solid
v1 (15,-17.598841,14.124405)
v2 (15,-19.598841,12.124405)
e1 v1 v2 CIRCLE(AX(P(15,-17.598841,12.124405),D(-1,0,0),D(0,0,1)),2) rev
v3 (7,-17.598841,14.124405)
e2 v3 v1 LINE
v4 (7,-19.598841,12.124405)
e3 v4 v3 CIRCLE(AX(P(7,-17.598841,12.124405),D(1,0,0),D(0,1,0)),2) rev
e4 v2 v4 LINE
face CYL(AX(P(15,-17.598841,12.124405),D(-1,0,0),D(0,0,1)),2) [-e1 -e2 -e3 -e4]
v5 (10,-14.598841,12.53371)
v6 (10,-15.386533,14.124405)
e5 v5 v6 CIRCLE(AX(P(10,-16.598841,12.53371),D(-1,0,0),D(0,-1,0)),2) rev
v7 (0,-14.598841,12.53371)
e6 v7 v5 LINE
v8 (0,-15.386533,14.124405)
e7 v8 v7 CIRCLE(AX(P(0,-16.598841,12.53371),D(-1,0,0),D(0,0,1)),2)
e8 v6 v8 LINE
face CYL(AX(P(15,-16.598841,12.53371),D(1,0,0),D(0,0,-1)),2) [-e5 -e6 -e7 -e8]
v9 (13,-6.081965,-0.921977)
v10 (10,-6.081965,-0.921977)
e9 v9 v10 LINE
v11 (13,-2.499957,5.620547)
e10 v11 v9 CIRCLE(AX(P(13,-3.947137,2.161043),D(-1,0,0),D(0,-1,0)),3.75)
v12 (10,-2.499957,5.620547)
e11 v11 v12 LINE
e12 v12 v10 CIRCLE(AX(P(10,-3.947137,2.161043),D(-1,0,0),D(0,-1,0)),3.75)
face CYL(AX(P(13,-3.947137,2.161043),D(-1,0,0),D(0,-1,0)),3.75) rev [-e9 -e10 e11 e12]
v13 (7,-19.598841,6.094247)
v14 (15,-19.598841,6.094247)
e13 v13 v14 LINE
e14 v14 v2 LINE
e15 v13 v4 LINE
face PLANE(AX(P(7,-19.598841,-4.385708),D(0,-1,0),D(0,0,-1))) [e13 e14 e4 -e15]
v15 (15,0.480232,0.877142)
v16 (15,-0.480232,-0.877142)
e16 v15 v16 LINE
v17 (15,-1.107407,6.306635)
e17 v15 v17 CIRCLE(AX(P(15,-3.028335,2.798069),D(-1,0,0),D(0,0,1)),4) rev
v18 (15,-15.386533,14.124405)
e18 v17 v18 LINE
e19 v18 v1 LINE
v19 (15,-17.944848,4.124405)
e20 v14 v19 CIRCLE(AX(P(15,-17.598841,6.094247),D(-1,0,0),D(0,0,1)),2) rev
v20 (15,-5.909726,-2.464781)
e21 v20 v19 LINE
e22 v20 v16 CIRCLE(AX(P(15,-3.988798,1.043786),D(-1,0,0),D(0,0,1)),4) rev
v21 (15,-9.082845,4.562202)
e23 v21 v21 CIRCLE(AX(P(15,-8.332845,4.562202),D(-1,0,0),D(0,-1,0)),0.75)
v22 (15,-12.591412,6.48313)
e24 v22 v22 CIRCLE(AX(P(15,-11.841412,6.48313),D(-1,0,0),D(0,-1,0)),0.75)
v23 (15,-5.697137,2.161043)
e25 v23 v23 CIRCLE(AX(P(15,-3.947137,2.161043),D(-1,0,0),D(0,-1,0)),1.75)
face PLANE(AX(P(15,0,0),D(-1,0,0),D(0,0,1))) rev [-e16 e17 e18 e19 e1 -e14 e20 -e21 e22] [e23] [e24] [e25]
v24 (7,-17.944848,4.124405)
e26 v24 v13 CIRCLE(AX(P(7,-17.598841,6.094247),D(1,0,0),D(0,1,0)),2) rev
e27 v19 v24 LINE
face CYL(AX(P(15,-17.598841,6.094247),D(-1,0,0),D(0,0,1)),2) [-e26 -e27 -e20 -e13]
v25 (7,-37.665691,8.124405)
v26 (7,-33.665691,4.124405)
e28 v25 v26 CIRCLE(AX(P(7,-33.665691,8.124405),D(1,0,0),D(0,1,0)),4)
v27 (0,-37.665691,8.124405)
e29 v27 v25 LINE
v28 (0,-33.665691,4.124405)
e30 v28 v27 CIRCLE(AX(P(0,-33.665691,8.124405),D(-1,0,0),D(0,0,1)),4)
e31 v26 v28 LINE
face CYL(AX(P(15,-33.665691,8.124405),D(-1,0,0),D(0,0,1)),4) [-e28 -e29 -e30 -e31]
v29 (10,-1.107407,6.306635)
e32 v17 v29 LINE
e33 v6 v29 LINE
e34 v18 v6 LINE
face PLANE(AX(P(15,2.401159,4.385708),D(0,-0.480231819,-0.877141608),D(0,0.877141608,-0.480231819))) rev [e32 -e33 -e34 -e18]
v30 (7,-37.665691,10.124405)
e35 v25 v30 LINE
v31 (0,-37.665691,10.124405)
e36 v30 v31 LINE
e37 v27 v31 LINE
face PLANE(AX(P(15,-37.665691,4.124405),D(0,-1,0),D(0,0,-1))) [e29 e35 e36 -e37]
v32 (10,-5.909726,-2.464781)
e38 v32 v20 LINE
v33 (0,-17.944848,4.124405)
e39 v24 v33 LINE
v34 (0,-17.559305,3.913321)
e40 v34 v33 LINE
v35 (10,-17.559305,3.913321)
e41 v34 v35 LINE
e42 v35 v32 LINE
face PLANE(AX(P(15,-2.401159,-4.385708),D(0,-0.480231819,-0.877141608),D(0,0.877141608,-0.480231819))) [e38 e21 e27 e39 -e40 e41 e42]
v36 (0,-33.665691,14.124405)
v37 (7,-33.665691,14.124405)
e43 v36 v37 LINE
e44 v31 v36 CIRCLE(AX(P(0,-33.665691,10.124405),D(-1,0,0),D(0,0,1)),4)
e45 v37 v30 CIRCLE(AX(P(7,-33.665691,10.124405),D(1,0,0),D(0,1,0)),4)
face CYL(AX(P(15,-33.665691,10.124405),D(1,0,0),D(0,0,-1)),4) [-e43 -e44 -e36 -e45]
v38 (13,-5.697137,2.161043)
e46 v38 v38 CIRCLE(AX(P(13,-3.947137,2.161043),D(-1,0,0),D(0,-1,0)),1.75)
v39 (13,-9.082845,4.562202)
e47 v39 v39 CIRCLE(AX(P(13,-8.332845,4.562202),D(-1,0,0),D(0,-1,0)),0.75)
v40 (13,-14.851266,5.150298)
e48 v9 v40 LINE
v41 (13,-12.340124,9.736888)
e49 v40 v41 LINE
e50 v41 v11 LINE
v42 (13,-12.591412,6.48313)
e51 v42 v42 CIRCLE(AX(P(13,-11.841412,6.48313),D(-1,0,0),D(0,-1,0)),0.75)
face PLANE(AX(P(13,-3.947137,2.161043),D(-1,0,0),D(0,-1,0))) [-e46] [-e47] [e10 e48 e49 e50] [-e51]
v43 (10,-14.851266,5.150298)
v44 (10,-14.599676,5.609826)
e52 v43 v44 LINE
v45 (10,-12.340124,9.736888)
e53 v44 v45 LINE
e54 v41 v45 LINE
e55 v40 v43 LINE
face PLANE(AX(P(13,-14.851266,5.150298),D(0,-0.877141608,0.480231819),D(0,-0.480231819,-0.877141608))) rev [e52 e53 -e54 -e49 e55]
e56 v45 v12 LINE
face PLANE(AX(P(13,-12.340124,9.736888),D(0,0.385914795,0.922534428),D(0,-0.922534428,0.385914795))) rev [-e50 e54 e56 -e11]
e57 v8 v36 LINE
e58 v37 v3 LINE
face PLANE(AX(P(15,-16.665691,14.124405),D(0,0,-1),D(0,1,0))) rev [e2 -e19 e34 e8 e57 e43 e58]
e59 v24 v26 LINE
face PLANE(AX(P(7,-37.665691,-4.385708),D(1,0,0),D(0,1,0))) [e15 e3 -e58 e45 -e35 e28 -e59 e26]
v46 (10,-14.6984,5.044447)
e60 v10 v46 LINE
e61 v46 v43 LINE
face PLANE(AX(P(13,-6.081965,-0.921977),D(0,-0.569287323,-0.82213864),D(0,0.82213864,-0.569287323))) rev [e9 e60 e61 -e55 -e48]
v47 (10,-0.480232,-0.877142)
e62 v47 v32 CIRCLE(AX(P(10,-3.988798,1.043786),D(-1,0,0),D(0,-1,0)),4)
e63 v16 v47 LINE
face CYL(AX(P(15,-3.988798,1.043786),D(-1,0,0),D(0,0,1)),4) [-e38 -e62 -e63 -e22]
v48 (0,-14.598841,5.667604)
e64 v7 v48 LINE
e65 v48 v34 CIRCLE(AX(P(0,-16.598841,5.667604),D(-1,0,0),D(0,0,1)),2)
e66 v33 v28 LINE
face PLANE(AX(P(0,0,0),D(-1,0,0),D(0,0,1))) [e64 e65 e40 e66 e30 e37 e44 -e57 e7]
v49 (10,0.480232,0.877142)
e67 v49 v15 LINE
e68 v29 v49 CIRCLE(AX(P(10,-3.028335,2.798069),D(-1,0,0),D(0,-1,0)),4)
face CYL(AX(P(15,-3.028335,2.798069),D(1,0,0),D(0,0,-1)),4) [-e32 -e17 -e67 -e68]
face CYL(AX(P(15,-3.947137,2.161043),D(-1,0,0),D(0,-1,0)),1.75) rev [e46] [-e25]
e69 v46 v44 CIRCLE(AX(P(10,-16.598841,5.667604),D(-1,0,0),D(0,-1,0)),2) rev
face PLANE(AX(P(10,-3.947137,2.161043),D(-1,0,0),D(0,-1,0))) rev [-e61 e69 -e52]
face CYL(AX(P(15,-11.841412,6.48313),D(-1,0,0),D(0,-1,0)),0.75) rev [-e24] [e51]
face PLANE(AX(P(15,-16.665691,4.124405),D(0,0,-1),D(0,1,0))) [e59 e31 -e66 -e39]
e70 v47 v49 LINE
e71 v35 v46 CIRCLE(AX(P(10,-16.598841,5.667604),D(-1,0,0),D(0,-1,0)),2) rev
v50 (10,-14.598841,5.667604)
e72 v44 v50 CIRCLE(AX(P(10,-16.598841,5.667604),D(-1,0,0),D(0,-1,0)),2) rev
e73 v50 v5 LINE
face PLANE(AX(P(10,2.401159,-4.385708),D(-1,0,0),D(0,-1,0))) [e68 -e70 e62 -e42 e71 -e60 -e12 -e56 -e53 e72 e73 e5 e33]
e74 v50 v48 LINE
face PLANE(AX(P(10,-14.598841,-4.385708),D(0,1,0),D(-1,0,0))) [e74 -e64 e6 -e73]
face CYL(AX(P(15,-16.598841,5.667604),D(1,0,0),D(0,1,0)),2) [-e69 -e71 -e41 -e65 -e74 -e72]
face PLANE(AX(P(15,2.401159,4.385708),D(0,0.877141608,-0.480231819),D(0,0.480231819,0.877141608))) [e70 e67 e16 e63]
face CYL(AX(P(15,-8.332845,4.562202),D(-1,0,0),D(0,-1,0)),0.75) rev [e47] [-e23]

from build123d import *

# Parameters (mm, degrees)
EXTRUDE_THIN1_DEPTH = 15
SKETCH4_OUTSIDE_W   = 26.324
SKETCH4_OUTSIDE_H   = 51.391
CUT_EXTRUDE1_DEPTH  = 45.568245566
CUT_EXTRUDE2_DEPTH  = 3
SKETCH7_R           = 1.75
SKETCH7_R_2         = 0.75
CUT_EXTRUDE3_DEPTH  = 43.275324346
FILLET1_R           = 4
FILLET2_R           = 2
FILLET3_R           = 2


with BuildPart() as part:
    # Sketch3 → Extrude-Thin1 (new body)
    with BuildSketch(Plane(origin=(0, 0, 0), x_dir=(0, 0, -1), z_dir=(1, 0, 0))):
        Polygon((-4.385708038, 2.401159095), (-14.124404563, -15.386533403), (-14.124404563, -37.665690546), (-4.124404563, -37.665690546), (-4.124404563, -17.944847689), (4.385708038, -2.401159095), align=None)
    extrude(amount=EXTRUDE_THIN1_DEPTH)

    # Sketch4 outside → Cut-Extrude1 (cut, through all)
    with BuildSketch(Plane.XY.offset(14.124404563)):
        with Locations((7.5, -17.6325)):
            Rectangle(SKETCH4_OUTSIDE_W, SKETCH4_OUTSIDE_H)
        Polygon((15, 2.401159095), (10, 2.401159095), (10, -14.598840905), (0, -14.598840905), (0, -37.665690546), (7, -37.665690546), (7, -19.598840905), (15, -19.598840905), align=None, mode=Mode.SUBTRACT)
    extrude(amount=-CUT_EXTRUDE1_DEPTH, mode=Mode.SUBTRACT)

    # Sketch6 → Cut-Extrude2 (cut)
    with BuildSketch(Plane.ZY.offset(-10)):
        with BuildLine():
            Line((-0.921976714, -6.081964697), (5.150298165, -14.851265553))
            Line((5.150298165, -14.851265553), (9.736888227, -12.340124285))
            Line((9.736888227, -12.340124285), (5.620547292, -2.499956755))
            ThreePointArc((5.620547292, -2.499956755), (0.360173864, -0.657856206), (-0.921976714, -6.081964697))
        make_face()
    extrude(amount=-CUT_EXTRUDE2_DEPTH, mode=Mode.SUBTRACT)

    # Sketch7 → Cut-Extrude3 (cut, through all)
    with BuildSketch(Plane.ZY.offset(-13)):
        with Locations(Location((2.161043186, -3.947137235, 0), (0, 0, 270))):
            Circle(SKETCH7_R)
        with Locations(Location((4.562202281, -8.332845273, 0), (0, 0, 270))):
            Circle(SKETCH7_R_2)
        with Locations(Location((6.483129558, -11.841411704, 0), (0, 0, 270))):
            Circle(SKETCH7_R_2)
    extrude(amount=-CUT_EXTRUDE3_DEPTH, mode=Mode.SUBTRACT)

    # Fillet1
    fillet1_edges = [part.edges().sort_by_distance(p)[0] for p in [
        (3.5, -37.665690546, 4.124404563),
        (3.5, -37.665690546, 14.124404563),
        (12.5, 2.401159095, 4.385708038),
        (12.5, -2.401159095, -4.385708038),
    ]]
    fillet(fillet1_edges, radius=FILLET1_R)

    # Fillet2
    # the kernel refuses this fillet: 2 mm, written as the material it takes off along each edge
    with BuildSketch(Plane(origin=(7, -19.598840905, 14.124404563), x_dir=(0, 1, 0), z_dir=(1, 0, 0))) as fillet2_piece_1:
        with BuildLine():
            CenterArc((FILLET2_R, -FILLET2_R), FILLET2_R, 90, 90)
            Line((0, -FILLET2_R), (-FILLET2_R * 0.02, -FILLET2_R))
            Line((-FILLET2_R * 0.02, -FILLET2_R), (-FILLET2_R * 0.02, FILLET2_R * 0.02))
            Line((-FILLET2_R * 0.02, FILLET2_R * 0.02), (FILLET2_R, FILLET2_R * 0.02))
            Line((FILLET2_R, FILLET2_R * 0.02), (FILLET2_R, 0))
        make_face()
    extrude(amount=13, mode=Mode.SUBTRACT)
    with BuildSketch(Plane(origin=(7, -19.598840905, 4.124404563), x_dir=(0, 1, 0), z_dir=(1, 0, 0))) as fillet2_piece_2:
        with BuildLine():
            CenterArc((2, 1.969842457), FILLET2_R, 180, 80.037511241)
            Line((0, 1.969842457), (-0.04, 1.969842457))
            Line((-0.04, 1.969842457), (-0.04, 0))
            Line((-0.04, 0), (0, -0.04))
            ThreePointArc((0, -0.04), (0.826996608, -0.04), (1.64707308, -0.039396849))
            Line((1.64707308, -0.039396849), (1.653993216, 0))
        make_face()
    extrude(amount=12.924606142, mode=Mode.SUBTRACT)

    # Fillet3
    # the kernel refuses this fillet: 2 mm, written as the material it takes off along each edge
    with BuildSketch(Plane(origin=(10, -14.598840905, 2.292478098), x_dir=(0, -0.8771416076820373, 0.48023181909674706), z_dir=(-1, 0, 0))) as fillet3_piece_1:
        with BuildLine():
            CenterArc((FILLET3_R * 1.68756310969, FILLET3_R), FILLET3_R, 151.299456423, 118.700543577)
            Line((FILLET3_R * 0.810421502006, FILLET3_R * 1.4802318191), (FILLET3_R * 0.792878669852, FILLET3_R * 1.48983645548))
            Line((FILLET3_R * 0.792878669852, FILLET3_R * 1.48983645548), (-FILLET3_R * 0.0337512621938, -FILLET3_R * 0.02))
            Line((-FILLET3_R * 0.0337512621938, -FILLET3_R * 0.02), (FILLET3_R * 1.68756310969, -FILLET3_R * 0.02))
            Line((FILLET3_R * 1.68756310969, -FILLET3_R * 0.02), (FILLET3_R * 1.68756310969, 0))
        make_face()
    extrude(amount=18.437815548, mode=Mode.SUBTRACT)
    with BuildSketch(Plane(origin=(-2.898590554, -14.598840905, 13.693145803), x_dir=(0, -0.8771416076820384, 0.48023181909674506), z_dir=(1, 0, 0))) as fillet3_piece_2:
        with BuildLine():
            CenterArc((1.19748505, 1.97745339), FILLET3_R, 208.700543577, 52.688089319)
            Line((-0.556798166, 1.016989751), (-0.59188383, 0.997780479))
            Line((-0.59188383, 0.997780479), (-0.035085664, -0.019209273))
            Line((-0.035085664, -0.019209273), (0, -0.04))
            ThreePointArc((0, -0.04), (0.449011022, -0.04), (0.892032783, -0.039549068))
            Line((0.892032783, -0.039549068), (0.898022043, 0))
        make_face()
    extrude(amount=12.898590554, mode=Mode.SUBTRACT)


solid = part.part
